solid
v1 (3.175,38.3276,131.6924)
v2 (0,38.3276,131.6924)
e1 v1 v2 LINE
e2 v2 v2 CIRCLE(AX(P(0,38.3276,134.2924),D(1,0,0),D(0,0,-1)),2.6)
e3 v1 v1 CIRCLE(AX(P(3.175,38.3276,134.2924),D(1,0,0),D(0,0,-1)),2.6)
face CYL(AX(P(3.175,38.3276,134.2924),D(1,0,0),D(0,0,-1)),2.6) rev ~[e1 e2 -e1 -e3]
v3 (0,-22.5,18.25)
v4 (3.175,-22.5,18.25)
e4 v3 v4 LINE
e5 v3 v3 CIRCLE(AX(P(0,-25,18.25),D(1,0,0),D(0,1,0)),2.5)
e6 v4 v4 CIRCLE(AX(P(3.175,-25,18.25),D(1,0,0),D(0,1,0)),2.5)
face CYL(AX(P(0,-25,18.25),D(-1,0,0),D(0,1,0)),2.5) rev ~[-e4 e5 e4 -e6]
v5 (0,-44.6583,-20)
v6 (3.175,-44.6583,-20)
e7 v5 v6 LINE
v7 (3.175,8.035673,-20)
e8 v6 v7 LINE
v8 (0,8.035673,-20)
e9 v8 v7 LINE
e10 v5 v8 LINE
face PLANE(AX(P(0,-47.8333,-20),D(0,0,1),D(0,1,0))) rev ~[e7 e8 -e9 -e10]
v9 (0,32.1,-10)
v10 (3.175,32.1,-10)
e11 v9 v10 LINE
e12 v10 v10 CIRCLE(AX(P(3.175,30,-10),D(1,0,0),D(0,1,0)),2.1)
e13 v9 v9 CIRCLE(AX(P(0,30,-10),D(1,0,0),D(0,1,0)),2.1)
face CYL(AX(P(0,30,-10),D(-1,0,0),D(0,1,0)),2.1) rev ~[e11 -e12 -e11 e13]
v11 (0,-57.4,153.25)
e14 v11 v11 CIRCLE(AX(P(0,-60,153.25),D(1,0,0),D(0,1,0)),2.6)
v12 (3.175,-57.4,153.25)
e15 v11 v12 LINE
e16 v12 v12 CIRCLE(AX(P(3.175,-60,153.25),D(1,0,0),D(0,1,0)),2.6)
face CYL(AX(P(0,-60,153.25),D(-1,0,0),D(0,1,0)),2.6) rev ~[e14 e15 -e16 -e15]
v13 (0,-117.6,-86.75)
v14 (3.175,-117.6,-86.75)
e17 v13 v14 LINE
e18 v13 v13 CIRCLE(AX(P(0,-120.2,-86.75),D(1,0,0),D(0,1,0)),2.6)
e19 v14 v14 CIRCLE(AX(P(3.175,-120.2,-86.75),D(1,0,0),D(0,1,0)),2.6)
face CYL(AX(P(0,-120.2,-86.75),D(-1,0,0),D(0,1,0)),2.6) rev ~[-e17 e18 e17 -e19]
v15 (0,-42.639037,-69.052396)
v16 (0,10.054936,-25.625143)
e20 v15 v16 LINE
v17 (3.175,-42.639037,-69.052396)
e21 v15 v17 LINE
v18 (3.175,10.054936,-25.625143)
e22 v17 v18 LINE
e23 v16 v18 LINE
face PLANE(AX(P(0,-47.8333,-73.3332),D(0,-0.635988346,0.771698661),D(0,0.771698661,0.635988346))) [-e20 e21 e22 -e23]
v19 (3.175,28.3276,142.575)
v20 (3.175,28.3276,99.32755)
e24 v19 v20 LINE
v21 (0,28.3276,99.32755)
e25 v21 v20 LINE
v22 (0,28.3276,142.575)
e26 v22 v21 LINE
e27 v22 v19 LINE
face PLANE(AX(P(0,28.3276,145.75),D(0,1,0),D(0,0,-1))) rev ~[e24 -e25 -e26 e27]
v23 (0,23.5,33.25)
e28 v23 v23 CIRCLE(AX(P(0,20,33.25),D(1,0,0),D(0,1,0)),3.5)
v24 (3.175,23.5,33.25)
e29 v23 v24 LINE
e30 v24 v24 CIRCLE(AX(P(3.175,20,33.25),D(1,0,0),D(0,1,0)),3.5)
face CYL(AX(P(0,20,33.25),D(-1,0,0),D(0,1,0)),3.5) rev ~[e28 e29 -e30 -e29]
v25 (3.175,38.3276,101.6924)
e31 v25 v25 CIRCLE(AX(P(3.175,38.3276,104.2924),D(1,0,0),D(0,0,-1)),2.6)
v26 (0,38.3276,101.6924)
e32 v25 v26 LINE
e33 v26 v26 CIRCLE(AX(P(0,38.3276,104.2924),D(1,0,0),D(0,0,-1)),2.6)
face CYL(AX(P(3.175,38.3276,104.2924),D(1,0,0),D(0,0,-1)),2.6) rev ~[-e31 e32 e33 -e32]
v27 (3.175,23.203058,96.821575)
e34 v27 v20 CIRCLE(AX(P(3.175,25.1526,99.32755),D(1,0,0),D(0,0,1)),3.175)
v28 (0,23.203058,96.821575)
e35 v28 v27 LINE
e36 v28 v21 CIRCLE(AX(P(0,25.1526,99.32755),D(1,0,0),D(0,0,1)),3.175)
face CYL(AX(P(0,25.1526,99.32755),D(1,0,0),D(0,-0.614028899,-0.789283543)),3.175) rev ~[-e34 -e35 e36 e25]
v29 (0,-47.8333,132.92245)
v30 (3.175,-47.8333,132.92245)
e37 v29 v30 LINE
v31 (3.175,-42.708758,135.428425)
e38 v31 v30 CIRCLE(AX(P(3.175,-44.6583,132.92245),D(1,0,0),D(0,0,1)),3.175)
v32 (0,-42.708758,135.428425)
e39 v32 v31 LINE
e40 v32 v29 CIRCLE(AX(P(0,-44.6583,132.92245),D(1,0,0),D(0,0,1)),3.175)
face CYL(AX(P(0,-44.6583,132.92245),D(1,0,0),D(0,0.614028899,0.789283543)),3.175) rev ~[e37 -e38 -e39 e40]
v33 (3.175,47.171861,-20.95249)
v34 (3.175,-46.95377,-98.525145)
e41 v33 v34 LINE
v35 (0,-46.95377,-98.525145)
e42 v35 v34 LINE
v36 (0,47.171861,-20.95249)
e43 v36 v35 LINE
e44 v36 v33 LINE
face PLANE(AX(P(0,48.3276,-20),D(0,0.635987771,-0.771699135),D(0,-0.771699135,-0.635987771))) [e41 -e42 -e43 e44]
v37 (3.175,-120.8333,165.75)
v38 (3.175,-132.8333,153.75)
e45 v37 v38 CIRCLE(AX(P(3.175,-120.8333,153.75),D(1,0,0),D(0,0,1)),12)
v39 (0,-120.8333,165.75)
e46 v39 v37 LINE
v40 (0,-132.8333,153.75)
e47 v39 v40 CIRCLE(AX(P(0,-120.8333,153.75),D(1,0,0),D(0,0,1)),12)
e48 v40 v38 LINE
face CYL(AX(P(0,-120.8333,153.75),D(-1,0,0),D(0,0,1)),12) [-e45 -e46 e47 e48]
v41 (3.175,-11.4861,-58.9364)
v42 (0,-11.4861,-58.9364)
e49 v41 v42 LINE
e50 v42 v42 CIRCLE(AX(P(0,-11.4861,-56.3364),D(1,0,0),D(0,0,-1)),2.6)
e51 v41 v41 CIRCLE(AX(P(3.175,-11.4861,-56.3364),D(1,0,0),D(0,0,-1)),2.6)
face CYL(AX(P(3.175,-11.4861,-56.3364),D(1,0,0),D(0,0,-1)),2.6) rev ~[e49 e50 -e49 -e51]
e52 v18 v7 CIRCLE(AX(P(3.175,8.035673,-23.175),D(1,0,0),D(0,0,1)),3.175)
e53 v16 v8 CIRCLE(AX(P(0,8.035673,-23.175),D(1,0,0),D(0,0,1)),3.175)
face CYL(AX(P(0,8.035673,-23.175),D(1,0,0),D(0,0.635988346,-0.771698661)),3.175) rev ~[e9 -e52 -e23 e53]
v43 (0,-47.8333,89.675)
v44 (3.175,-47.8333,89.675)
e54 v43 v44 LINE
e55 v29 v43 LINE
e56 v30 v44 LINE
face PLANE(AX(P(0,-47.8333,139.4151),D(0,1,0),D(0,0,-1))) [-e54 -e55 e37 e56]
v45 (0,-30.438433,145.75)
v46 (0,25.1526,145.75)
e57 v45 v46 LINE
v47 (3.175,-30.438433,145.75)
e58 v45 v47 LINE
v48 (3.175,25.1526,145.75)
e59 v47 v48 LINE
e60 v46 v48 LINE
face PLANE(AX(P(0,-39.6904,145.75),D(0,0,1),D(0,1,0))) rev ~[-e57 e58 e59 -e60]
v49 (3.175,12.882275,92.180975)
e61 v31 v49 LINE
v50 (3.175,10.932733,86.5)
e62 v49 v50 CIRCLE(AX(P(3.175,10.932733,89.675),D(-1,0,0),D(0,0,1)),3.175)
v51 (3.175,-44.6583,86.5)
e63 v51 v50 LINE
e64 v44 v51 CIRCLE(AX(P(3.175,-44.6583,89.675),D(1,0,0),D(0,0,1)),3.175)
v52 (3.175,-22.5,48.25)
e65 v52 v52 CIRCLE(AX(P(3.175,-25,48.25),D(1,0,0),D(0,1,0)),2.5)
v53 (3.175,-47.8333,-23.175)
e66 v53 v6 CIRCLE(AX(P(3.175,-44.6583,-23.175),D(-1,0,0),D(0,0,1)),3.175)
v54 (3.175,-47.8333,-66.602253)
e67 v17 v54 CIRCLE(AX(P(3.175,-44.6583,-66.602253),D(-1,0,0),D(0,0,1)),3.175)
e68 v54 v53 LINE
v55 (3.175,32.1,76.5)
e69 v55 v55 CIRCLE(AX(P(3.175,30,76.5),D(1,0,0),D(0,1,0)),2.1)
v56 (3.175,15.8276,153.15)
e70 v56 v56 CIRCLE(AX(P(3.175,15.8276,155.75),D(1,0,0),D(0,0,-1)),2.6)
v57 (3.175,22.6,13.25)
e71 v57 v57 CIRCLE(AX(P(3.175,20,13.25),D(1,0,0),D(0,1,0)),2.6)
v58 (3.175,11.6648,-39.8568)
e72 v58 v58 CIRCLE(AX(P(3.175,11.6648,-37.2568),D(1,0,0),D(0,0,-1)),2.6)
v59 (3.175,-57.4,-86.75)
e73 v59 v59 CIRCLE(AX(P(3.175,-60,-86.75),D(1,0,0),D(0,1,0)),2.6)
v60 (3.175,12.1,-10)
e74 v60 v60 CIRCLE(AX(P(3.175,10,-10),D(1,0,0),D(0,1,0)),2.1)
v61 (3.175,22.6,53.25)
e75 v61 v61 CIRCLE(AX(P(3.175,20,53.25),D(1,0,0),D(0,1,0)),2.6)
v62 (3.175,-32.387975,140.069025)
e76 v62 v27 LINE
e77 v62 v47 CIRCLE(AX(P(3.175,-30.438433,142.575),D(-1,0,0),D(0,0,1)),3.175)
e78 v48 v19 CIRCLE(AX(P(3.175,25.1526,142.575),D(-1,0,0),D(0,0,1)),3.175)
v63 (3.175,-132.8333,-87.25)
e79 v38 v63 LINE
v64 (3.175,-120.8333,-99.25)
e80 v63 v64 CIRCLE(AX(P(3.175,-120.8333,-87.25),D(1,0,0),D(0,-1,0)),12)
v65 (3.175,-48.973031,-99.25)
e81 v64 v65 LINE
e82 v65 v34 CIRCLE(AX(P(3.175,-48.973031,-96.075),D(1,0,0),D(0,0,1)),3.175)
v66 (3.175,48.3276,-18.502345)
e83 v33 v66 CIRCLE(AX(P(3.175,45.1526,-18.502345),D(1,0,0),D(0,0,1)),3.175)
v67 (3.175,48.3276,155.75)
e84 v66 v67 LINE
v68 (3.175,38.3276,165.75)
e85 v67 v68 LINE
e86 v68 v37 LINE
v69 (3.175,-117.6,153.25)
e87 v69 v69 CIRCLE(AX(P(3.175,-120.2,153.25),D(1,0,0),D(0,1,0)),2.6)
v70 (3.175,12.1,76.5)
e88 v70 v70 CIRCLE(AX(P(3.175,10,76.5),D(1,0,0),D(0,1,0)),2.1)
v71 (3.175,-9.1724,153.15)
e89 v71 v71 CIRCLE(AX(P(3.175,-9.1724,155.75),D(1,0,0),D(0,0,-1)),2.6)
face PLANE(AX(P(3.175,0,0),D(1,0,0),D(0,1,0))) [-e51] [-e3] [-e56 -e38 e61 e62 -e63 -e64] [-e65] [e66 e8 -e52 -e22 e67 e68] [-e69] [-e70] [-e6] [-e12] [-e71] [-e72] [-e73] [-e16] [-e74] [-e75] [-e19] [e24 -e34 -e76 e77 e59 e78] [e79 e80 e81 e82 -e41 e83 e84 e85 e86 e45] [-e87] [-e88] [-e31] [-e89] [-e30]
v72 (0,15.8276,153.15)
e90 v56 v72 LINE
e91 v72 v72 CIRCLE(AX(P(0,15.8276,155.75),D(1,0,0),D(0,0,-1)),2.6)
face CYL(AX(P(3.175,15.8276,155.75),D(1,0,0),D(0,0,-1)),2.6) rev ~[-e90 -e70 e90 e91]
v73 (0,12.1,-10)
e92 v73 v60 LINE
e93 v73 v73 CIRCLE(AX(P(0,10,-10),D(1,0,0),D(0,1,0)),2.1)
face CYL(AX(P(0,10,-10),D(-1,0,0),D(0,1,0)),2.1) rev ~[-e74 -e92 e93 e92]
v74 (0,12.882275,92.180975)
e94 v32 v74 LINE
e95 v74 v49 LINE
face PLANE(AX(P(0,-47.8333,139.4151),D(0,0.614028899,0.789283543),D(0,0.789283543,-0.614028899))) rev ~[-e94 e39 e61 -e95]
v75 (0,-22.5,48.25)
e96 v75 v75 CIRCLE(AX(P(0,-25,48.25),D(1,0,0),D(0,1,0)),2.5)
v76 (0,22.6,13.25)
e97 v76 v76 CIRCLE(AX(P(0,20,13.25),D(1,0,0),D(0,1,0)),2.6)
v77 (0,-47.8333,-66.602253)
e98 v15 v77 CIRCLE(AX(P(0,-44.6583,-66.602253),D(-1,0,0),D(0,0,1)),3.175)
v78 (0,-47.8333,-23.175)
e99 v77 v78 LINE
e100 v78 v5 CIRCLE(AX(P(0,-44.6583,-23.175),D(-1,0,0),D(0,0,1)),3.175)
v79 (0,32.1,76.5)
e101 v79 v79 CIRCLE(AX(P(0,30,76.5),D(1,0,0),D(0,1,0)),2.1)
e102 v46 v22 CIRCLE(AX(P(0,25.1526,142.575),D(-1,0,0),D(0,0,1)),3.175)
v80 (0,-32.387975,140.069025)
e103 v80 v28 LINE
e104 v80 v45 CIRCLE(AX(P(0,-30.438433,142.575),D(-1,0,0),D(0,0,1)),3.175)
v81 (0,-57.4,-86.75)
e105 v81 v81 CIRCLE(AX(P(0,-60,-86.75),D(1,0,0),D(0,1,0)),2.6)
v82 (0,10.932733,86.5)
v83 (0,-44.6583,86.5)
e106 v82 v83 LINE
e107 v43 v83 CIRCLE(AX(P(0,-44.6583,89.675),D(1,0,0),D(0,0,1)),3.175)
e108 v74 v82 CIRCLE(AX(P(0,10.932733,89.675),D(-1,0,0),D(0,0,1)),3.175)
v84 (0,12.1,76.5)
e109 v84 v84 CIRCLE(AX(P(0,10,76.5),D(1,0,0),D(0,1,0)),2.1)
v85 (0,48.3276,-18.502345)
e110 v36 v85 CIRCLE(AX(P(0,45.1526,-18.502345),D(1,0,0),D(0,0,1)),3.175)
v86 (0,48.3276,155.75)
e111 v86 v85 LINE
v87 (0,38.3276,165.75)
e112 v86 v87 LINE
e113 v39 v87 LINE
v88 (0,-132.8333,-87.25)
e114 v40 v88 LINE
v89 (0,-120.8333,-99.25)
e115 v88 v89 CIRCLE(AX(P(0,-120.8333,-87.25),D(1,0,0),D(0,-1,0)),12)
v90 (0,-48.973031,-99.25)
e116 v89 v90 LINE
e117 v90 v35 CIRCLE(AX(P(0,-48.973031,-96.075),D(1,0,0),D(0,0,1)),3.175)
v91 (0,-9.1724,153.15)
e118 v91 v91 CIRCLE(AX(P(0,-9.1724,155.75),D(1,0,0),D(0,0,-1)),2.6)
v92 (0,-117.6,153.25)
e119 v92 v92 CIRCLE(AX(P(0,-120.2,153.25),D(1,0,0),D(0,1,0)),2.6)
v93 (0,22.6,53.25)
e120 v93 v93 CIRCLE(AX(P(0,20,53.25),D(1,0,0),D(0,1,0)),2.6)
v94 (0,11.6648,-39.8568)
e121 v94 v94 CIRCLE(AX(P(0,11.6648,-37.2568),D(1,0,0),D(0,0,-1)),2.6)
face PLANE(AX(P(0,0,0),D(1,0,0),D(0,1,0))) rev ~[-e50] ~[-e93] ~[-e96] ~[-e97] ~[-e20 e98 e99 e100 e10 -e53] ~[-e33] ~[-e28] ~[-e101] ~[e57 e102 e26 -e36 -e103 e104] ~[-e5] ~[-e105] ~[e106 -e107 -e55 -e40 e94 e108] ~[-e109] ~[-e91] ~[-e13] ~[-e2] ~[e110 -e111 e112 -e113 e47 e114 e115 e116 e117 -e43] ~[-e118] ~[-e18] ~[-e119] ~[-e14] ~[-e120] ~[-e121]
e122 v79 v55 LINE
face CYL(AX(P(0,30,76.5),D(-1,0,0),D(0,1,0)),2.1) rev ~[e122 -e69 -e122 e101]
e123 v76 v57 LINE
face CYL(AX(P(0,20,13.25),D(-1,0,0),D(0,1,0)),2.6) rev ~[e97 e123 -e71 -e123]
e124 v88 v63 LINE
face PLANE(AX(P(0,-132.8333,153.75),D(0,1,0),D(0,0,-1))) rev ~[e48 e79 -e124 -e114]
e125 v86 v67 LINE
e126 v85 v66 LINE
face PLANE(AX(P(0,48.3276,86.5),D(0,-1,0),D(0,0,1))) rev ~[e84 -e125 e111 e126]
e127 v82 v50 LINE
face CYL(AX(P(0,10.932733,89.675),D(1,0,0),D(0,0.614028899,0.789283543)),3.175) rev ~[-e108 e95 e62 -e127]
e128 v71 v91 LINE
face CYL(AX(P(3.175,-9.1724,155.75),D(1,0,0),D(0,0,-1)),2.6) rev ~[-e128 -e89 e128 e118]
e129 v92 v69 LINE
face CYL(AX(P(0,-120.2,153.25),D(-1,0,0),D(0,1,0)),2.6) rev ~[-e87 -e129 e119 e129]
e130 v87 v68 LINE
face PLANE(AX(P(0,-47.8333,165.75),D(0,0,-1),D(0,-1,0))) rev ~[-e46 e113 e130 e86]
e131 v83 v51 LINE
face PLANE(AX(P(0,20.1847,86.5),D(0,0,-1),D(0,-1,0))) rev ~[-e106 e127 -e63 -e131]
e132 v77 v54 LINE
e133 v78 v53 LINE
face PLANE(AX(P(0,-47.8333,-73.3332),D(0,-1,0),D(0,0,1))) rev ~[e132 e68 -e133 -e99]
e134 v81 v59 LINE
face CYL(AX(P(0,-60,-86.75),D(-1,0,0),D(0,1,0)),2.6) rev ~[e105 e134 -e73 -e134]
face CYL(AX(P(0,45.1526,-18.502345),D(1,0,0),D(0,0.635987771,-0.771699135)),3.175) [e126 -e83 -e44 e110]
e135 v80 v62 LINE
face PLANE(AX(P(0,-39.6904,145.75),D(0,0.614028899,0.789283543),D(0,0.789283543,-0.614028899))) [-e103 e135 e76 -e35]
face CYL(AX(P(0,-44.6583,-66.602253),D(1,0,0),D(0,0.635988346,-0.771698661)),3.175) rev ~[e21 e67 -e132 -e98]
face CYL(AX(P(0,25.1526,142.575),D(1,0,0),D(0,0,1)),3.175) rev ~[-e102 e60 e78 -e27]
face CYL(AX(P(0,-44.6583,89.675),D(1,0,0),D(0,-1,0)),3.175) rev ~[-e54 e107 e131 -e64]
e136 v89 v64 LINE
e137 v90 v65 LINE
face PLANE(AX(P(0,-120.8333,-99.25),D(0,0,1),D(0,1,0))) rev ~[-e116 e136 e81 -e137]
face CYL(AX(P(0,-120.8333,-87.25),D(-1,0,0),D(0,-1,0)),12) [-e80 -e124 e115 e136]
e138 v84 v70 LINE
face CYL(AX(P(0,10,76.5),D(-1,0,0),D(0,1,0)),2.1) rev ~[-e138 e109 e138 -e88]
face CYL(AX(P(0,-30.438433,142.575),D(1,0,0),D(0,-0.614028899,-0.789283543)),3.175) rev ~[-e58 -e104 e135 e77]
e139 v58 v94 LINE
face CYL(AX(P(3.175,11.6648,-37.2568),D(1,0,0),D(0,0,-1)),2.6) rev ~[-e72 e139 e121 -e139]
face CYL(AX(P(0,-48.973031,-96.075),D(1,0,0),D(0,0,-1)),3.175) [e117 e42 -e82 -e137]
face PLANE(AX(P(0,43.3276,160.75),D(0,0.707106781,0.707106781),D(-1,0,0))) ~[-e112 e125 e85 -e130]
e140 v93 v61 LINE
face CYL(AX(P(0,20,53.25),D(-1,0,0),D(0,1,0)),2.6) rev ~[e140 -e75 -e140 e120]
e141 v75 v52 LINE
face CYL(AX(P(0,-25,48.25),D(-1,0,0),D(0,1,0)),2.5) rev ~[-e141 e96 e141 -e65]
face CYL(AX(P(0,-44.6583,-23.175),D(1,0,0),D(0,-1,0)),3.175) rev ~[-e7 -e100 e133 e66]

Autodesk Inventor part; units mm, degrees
ref_plane "YZ Plane" through (0, 0, 0) normal (1, 0, 0) x (0, 1, 0)
ref_plane "XZ Plane" through (0, 0, 0) normal (0, 1, 0) x (-1, 0, 0)
ref_plane "XY Plane" through (0, 0, 0) normal (0, 0, 1) x (1, 0, 0)
sketch "Sketch1" plane through (0, 0, 0) normal (1, 0, 0) x (0, 1, 0)
  line L0 (0, 0) -> (40, 0) construction
  line L1 (40, 0) -> (40, 66.5) construction
  line L2 (40, 66.5) -> (0, 66.5) construction
  line L3 (0, 66.5) -> (0, 0) construction
  line L4 (0, 66.5) -> (40, 66.5) construction
  line L5 (40, 66.5) -> (40, 86.5) construction
  line L6 (40, 86.5) -> (0, 86.5)
  line L7 (0, 86.5) -> (0, 66.5) construction
  line L8 (0, 0) -> (40, 0) construction
  line L9 (40, 0) -> (40, -20) construction
  line L10 (40, -20) -> (0, -20) construction
  line L11 (0, -20) -> (0, 0) construction
  line L12 (48.2, 61.45) -> (-8.2, 61.45) construction
  line L13 (-8.2, 61.45) -> (-8.2, 5.05) construction
  line L14 (-8.2, 5.05) -> (48.2, 5.05) construction
  line L15 (48.2, 5.05) -> (48.2, 61.45) construction
  line L16 (48.2, 33.25) -> (-8.2, 33.25) construction
  line L17 (40, 33.25) -> (0, 33.25) construction
  line L18 (43.57, 56.82) -> (-3.57, 56.82) construction
  line L19 (-3.57, 56.82) -> (-3.57, 9.68) construction
  line L20 (-3.57, 9.68) -> (43.57, 9.68) construction
  line L21 (43.57, 9.68) -> (43.57, 56.82) construction
  line L22 (43.57, 56.82) -> (48.2, 56.82) construction
  line L23 (43.57, 56.82) -> (43.57, 61.45) construction
  line L24 (-3.57, 9.68) -> (-8.2, 9.68) construction
  line L25 (-3.57, 9.68) -> (-3.57, 5.05) construction
  line L26 (40, -10) -> (0, -10) construction
  line L27 (40, 76.5) -> (0, 76.5) construction
  circle A0 centre (30, 76.5) radius 2.1
  circle A1 centre (10, 76.5) radius 2.1
  circle A2 centre (30, -10) radius 2.1
  circle A3 centre (10, -10) radius 2.1
  circle A4 centre (43.57, 56.82) radius 2.6 construction
  circle A5 centre (43.57, 9.68) radius 2.6 construction
  circle A6 centre (-3.57, 9.68) radius 2.6 construction
  circle A7 centre (-3.57, 56.82) radius 2.6 construction
  circle A8 centre (-25, 18.25) radius 11.08 construction
  circle A9 centre (-25, 18.25) radius 13 construction
  circle A10 centre (-25, 18.25) radius 2.5
  line L28 (-60, 153.25) -> (-60, -86.75) construction
  circle A11 centre (-60, -86.75) radius 2.6
  circle A12 centre (-60, 153.25) radius 2.6
  line L29 (-120.2, 153.25) -> (-120.2, -86.75) construction
  circle A13 centre (-120.2, -86.75) radius 2.6
  circle A14 centre (-120.2, 153.25) radius 2.6
  circle A15 centre (-60, -86.75) radius 12 construction
  circle A16 centre (-120.2, -86.75) radius 12 construction
  circle A17 centre (-120.2, 153.25) radius 12 construction
  circle A18 centre (-60, 153.25) radius 12 construction
  line L30 (-110, 482.7599) -> (-70, 482.7599) construction
  line L31 (-70, -517.2401) -> (-110, -517.2401) construction
  circle A19 centre (-25, 48.25) radius 2.5
  circle A20 centre (-25, 48.25) radius 11.08 construction
  circle A21 centre (-25, 48.25) radius 13 construction
  circle A22 centre (20, 33.25) radius 11.08 construction
  circle A23 centre (20, 33.25) radius 13 construction
  line L32 (-23.1873, 29.1807) -> (18.1873, 22.3193) construction
  line L33 (18.1873, 44.1807) -> (-23.1873, 37.3193) construction
  line L34 (-120.8333, -99.25) -> (-47.8333, -99.25)
  line L35 (-47.8333, 165.75) -> (-120.8333, 165.75)
  line L36 (-132.8333, 153.75) -> (-132.8333, -87.25)
  line L37 (-60, 153.25) -> (-120.2, 153.25) construction
  line L38 (-120.2, -86.75) -> (-60, -86.75) construction
  line L39 (-60, 153.25) -> (-60, 165.75) construction
  line L40 (-120.2, -86.75) -> (-120.2, -99.25) construction
  line L41 (48.3276, -20) -> (48.3276, 86.5)
  line L42 (17.6122, 86.5) -> (40, 86.5) construction
  arc A24 (-120.8333, 165.75) -> (-132.8333, 153.75) centre (-120.8333, 153.75) ccw
  arc A25 (-132.8333, -87.25) -> (-120.8333, -99.25) centre (-120.8333, -87.25) ccw
  line L43 (48.3276, -20) -> (-47.8333, -99.25)
  line L44 (-47.8333, 165.75) -> (-47.8333, -99.25) construction
  line L45 (-120.2, -86.75) -> (-132.8333, -86.75) construction
  line L46 (-60, 153.25) -> (-47.8333, 153.25) construction
  line L47 (-36.08, 48.25) -> (-36.08, 286.613) construction
  line L48 (-47.8333, 145.75) -> (-47.8333, 86.5)
  line L49 (-47.8333, 86.5) -> (16.8804, 86.5)
  line L50 (-47.8333, -73.3332) -> (16.8804, -20)
  line L51 (-47.8333, -20) -> (16.8804, -20)
  line L52 (-47.8333, -73.3332) -> (-47.8333, -20)
  line L53 (48.3276, 86.5) -> (48.3276, 165.75)
  line L54 (48.3276, 165.75) -> (-47.8333, 165.75)
  line L55 (-47.8333, 145.75) -> (28.3276, 145.75)
  line L56 (28.3276, 145.75) -> (28.3276, 86.5)
  line L57 (-47.8333, 145.75) -> (28.3276, 86.5) construction
  line L58 (-39.6904, 145.75) -> (28.3276, 92.8349)
  line L59 (-47.8333, 139.4151) -> (20.1847, 86.5)
  circle A26 centre (20, 33.25) radius 3.5
  line L60 (20, 33.25) -> (20, 13.25) construction
  line L61 (20, 33.25) -> (20, 53.25) construction
  circle A27 centre (20, 13.25) radius 2.6
  circle A28 centre (20, 53.25) radius 2.6
  point P0 (-132.8333, -99.25)
  point P1 (-132.8333, 165.75)
  point P2 (-47.8333, 139.8332)
  point P3 (0, 86.5)
  point P4 (0, 86.5)
  dimension "d181" = 22.16
  dimension "d156" = 40
  dimension "d157" = 66.5
  dimension "d158" = 40
  dimension "d159" = 20
  dimension "d160" = 40
  dimension "d161" = 20
  dimension "d162" = 56.4
  dimension "d163" = 56.4
  dimension "d164" = 0
  dimension "d165" = 8.2
  dimension "d166" = 47.14
  dimension "d167" = 47.14
  dimension "d168" = 4.2
  dimension "d169" = 20
  dimension "d170" = 10
  dimension "d171" = 10
  dimension "d172" = 20
  dimension "d173" = 4.2
  dimension "d174" = 4.2
  dimension "d175" = 4.2
  dimension "d176" = 5.2
  dimension "d177" = 5.2
  dimension "d178" = 5.2
  dimension "d179" = 5.2
  dimension "d182" = 26
  dimension "d183" = 5
  dimension "d184" = 240
  dimension "d185" = 60
  dimension "d186" = 5.2
  dimension "d187" = 5.2
  dimension "d188" = 5.2
  dimension "d189" = 5.2
  dimension "d190" = 60.2
  dimension "d191" = 24
  dimension "d192" = 24
  dimension "d193" = 24
  dimension "d194" = 24
  dimension "d195" = 40
  dimension "d196" = 1000
  dimension "d198" = 5
  dimension "d199" = 22.16
  dimension "d200" = 26
  dimension "d202" = 22.16
  dimension "d203" = 26
  dimension "d205" = 15
  dimension "d206" = 265
  dimension "d207" = 85
  dimension "d208" = 106.5
  dimension "d209" = 12
  dimension "d210" = 72.8333
  dimension "d212" = 53.25
  dimension "d213" = 85
  dimension "d214" = 132.5
  dimension "d215" = 60.2
  dimension "d216" = 20
  dimension "d217" = 20
  dimension "d218" = 5
  dimension "d219" = 5
  dimension "d220" = 7
  dimension "d221" = 20
  dimension "d222" = 20
  dimension "d223" = 5.2
  dimension "d224" = 5.2
extrude "Extrusion1" add sketch "Sketch1" along normal blind 3.175 contours L6 L59 L48 L55 L58 L56 | A25 L36 A24 L35 L54 L53 L41 L43 L34
sketch "Sketch4" plane through (3.175, 0, 0) normal (1, 0, 0) x (0, 0, -1)
  line L0 (20, 16.8804) -> (73.3332, -47.8333) projected
  line L1 (39.0796, -6.2705) -> (54.5136, 6.4492) construction
  line L2 (99.25, -47.8333) -> (20, 48.3276) construction
  line L3 (46.7966, 0.0893) -> (37.2568, 11.6648) construction
  line L4 (46.7966, 0.0893) -> (56.3364, -11.4861) construction
  circle A0 centre (37.2568, 11.6648) radius 2.6
  circle A1 centre (56.3364, -11.4861) radius 2.6
  line L5 (-145.75, 28.3276) -> (-92.8349, 28.3276) projected
  line L6 (-119.2924, 28.3276) -> (-119.2924, 48.3276) construction
  line L7 (20, 48.3276) -> (-165.75, 48.3276) construction
  line L8 (-119.2924, 38.3276) -> (-104.2924, 38.3276) construction
  line L9 (-119.2924, 38.3276) -> (-134.2924, 38.3276) construction
  circle A2 centre (-134.2924, 38.3276) radius 2.6
  circle A3 centre (-104.2924, 38.3276) radius 2.6
  point P0 (0, 0)
  point P1 (0, 0)
  dimension "d228" = 30
  dimension "d229" = 15
  dimension "d230" = 15
  dimension "d231" = 5.2
  dimension "d232" = 5.2
  dimension "d233" = 15
  dimension "d234" = 15
  dimension "d235" = 5.2
  dimension "d236" = 5.2
  dimension "d237" = 52.9151
  dimension "d238" = 26.4576
extrude "Extrusion4" cut sketch "Sketch4" against normal through all
fillet "Fillet2" radius 3.175 11 edges at (1.5875, 28.3276, 92.8349) (1.5875, 20.1847, 86.5) (1.5875, -39.6904, 145.75) (1.5875, -47.8333, 139.4151) (1.5875, 16.8804, -20) (1.5875, 48.3276, -20) (1.5875, -47.8333, -20) (1.5875, -47.8333, -73.3332) (1.5875, -47.8333, -99.25) (1.5875, -47.8333, 86.5) (1.5875, 28.3276, 145.75)
chamfer "Chamfer1" distance 10 angle 45 1 edges at (1.5875, 48.3276, 165.75)
sketch "Sketch5" plane through (3.175, 0, 0) normal (1, 0, 0) x (0, 0, -1)
  line L0 (-145.75, -30.4384) -> (-145.75, 25.1526) projected
  line L1 (-165.75, 38.3276) -> (-165.75, -120.8333) projected
  line L2 (-145.75, 28.3276) -> (-165.75, 28.3276)
  line L3 (-165.75, 28.3276) -> (-165.75, -21.6724)
  line L4 (-165.75, -21.6724) -> (-145.75, -21.6724)
  line L5 (-145.75, -21.6724) -> (-145.75, 28.3276)
  line L6 (18.5023, 48.3276) -> (-155.75, 48.3276) projected
  line L7 (-142.575, 28.3276) -> (-99.3275, 28.3276) projected
  line L8 (-155.75, 28.3276) -> (-155.75, -21.6724) construction
  circle A0 centre (-155.75, 15.8276) radius 2.6
  circle A1 centre (-155.75, -9.1724) radius 2.6
  point P0 (0, 0)
  dimension "d239" = 50
  dimension "d241" = 5.2
  dimension "d242" = 5.2
  dimension "d243" = 12.5
  dimension "d244" = 12.5
extrude "Extrusion5" cut sketch "Sketch5" against normal up to next contours A0 | A1
properties part number "X Axis V Wheel Frame Machined"
